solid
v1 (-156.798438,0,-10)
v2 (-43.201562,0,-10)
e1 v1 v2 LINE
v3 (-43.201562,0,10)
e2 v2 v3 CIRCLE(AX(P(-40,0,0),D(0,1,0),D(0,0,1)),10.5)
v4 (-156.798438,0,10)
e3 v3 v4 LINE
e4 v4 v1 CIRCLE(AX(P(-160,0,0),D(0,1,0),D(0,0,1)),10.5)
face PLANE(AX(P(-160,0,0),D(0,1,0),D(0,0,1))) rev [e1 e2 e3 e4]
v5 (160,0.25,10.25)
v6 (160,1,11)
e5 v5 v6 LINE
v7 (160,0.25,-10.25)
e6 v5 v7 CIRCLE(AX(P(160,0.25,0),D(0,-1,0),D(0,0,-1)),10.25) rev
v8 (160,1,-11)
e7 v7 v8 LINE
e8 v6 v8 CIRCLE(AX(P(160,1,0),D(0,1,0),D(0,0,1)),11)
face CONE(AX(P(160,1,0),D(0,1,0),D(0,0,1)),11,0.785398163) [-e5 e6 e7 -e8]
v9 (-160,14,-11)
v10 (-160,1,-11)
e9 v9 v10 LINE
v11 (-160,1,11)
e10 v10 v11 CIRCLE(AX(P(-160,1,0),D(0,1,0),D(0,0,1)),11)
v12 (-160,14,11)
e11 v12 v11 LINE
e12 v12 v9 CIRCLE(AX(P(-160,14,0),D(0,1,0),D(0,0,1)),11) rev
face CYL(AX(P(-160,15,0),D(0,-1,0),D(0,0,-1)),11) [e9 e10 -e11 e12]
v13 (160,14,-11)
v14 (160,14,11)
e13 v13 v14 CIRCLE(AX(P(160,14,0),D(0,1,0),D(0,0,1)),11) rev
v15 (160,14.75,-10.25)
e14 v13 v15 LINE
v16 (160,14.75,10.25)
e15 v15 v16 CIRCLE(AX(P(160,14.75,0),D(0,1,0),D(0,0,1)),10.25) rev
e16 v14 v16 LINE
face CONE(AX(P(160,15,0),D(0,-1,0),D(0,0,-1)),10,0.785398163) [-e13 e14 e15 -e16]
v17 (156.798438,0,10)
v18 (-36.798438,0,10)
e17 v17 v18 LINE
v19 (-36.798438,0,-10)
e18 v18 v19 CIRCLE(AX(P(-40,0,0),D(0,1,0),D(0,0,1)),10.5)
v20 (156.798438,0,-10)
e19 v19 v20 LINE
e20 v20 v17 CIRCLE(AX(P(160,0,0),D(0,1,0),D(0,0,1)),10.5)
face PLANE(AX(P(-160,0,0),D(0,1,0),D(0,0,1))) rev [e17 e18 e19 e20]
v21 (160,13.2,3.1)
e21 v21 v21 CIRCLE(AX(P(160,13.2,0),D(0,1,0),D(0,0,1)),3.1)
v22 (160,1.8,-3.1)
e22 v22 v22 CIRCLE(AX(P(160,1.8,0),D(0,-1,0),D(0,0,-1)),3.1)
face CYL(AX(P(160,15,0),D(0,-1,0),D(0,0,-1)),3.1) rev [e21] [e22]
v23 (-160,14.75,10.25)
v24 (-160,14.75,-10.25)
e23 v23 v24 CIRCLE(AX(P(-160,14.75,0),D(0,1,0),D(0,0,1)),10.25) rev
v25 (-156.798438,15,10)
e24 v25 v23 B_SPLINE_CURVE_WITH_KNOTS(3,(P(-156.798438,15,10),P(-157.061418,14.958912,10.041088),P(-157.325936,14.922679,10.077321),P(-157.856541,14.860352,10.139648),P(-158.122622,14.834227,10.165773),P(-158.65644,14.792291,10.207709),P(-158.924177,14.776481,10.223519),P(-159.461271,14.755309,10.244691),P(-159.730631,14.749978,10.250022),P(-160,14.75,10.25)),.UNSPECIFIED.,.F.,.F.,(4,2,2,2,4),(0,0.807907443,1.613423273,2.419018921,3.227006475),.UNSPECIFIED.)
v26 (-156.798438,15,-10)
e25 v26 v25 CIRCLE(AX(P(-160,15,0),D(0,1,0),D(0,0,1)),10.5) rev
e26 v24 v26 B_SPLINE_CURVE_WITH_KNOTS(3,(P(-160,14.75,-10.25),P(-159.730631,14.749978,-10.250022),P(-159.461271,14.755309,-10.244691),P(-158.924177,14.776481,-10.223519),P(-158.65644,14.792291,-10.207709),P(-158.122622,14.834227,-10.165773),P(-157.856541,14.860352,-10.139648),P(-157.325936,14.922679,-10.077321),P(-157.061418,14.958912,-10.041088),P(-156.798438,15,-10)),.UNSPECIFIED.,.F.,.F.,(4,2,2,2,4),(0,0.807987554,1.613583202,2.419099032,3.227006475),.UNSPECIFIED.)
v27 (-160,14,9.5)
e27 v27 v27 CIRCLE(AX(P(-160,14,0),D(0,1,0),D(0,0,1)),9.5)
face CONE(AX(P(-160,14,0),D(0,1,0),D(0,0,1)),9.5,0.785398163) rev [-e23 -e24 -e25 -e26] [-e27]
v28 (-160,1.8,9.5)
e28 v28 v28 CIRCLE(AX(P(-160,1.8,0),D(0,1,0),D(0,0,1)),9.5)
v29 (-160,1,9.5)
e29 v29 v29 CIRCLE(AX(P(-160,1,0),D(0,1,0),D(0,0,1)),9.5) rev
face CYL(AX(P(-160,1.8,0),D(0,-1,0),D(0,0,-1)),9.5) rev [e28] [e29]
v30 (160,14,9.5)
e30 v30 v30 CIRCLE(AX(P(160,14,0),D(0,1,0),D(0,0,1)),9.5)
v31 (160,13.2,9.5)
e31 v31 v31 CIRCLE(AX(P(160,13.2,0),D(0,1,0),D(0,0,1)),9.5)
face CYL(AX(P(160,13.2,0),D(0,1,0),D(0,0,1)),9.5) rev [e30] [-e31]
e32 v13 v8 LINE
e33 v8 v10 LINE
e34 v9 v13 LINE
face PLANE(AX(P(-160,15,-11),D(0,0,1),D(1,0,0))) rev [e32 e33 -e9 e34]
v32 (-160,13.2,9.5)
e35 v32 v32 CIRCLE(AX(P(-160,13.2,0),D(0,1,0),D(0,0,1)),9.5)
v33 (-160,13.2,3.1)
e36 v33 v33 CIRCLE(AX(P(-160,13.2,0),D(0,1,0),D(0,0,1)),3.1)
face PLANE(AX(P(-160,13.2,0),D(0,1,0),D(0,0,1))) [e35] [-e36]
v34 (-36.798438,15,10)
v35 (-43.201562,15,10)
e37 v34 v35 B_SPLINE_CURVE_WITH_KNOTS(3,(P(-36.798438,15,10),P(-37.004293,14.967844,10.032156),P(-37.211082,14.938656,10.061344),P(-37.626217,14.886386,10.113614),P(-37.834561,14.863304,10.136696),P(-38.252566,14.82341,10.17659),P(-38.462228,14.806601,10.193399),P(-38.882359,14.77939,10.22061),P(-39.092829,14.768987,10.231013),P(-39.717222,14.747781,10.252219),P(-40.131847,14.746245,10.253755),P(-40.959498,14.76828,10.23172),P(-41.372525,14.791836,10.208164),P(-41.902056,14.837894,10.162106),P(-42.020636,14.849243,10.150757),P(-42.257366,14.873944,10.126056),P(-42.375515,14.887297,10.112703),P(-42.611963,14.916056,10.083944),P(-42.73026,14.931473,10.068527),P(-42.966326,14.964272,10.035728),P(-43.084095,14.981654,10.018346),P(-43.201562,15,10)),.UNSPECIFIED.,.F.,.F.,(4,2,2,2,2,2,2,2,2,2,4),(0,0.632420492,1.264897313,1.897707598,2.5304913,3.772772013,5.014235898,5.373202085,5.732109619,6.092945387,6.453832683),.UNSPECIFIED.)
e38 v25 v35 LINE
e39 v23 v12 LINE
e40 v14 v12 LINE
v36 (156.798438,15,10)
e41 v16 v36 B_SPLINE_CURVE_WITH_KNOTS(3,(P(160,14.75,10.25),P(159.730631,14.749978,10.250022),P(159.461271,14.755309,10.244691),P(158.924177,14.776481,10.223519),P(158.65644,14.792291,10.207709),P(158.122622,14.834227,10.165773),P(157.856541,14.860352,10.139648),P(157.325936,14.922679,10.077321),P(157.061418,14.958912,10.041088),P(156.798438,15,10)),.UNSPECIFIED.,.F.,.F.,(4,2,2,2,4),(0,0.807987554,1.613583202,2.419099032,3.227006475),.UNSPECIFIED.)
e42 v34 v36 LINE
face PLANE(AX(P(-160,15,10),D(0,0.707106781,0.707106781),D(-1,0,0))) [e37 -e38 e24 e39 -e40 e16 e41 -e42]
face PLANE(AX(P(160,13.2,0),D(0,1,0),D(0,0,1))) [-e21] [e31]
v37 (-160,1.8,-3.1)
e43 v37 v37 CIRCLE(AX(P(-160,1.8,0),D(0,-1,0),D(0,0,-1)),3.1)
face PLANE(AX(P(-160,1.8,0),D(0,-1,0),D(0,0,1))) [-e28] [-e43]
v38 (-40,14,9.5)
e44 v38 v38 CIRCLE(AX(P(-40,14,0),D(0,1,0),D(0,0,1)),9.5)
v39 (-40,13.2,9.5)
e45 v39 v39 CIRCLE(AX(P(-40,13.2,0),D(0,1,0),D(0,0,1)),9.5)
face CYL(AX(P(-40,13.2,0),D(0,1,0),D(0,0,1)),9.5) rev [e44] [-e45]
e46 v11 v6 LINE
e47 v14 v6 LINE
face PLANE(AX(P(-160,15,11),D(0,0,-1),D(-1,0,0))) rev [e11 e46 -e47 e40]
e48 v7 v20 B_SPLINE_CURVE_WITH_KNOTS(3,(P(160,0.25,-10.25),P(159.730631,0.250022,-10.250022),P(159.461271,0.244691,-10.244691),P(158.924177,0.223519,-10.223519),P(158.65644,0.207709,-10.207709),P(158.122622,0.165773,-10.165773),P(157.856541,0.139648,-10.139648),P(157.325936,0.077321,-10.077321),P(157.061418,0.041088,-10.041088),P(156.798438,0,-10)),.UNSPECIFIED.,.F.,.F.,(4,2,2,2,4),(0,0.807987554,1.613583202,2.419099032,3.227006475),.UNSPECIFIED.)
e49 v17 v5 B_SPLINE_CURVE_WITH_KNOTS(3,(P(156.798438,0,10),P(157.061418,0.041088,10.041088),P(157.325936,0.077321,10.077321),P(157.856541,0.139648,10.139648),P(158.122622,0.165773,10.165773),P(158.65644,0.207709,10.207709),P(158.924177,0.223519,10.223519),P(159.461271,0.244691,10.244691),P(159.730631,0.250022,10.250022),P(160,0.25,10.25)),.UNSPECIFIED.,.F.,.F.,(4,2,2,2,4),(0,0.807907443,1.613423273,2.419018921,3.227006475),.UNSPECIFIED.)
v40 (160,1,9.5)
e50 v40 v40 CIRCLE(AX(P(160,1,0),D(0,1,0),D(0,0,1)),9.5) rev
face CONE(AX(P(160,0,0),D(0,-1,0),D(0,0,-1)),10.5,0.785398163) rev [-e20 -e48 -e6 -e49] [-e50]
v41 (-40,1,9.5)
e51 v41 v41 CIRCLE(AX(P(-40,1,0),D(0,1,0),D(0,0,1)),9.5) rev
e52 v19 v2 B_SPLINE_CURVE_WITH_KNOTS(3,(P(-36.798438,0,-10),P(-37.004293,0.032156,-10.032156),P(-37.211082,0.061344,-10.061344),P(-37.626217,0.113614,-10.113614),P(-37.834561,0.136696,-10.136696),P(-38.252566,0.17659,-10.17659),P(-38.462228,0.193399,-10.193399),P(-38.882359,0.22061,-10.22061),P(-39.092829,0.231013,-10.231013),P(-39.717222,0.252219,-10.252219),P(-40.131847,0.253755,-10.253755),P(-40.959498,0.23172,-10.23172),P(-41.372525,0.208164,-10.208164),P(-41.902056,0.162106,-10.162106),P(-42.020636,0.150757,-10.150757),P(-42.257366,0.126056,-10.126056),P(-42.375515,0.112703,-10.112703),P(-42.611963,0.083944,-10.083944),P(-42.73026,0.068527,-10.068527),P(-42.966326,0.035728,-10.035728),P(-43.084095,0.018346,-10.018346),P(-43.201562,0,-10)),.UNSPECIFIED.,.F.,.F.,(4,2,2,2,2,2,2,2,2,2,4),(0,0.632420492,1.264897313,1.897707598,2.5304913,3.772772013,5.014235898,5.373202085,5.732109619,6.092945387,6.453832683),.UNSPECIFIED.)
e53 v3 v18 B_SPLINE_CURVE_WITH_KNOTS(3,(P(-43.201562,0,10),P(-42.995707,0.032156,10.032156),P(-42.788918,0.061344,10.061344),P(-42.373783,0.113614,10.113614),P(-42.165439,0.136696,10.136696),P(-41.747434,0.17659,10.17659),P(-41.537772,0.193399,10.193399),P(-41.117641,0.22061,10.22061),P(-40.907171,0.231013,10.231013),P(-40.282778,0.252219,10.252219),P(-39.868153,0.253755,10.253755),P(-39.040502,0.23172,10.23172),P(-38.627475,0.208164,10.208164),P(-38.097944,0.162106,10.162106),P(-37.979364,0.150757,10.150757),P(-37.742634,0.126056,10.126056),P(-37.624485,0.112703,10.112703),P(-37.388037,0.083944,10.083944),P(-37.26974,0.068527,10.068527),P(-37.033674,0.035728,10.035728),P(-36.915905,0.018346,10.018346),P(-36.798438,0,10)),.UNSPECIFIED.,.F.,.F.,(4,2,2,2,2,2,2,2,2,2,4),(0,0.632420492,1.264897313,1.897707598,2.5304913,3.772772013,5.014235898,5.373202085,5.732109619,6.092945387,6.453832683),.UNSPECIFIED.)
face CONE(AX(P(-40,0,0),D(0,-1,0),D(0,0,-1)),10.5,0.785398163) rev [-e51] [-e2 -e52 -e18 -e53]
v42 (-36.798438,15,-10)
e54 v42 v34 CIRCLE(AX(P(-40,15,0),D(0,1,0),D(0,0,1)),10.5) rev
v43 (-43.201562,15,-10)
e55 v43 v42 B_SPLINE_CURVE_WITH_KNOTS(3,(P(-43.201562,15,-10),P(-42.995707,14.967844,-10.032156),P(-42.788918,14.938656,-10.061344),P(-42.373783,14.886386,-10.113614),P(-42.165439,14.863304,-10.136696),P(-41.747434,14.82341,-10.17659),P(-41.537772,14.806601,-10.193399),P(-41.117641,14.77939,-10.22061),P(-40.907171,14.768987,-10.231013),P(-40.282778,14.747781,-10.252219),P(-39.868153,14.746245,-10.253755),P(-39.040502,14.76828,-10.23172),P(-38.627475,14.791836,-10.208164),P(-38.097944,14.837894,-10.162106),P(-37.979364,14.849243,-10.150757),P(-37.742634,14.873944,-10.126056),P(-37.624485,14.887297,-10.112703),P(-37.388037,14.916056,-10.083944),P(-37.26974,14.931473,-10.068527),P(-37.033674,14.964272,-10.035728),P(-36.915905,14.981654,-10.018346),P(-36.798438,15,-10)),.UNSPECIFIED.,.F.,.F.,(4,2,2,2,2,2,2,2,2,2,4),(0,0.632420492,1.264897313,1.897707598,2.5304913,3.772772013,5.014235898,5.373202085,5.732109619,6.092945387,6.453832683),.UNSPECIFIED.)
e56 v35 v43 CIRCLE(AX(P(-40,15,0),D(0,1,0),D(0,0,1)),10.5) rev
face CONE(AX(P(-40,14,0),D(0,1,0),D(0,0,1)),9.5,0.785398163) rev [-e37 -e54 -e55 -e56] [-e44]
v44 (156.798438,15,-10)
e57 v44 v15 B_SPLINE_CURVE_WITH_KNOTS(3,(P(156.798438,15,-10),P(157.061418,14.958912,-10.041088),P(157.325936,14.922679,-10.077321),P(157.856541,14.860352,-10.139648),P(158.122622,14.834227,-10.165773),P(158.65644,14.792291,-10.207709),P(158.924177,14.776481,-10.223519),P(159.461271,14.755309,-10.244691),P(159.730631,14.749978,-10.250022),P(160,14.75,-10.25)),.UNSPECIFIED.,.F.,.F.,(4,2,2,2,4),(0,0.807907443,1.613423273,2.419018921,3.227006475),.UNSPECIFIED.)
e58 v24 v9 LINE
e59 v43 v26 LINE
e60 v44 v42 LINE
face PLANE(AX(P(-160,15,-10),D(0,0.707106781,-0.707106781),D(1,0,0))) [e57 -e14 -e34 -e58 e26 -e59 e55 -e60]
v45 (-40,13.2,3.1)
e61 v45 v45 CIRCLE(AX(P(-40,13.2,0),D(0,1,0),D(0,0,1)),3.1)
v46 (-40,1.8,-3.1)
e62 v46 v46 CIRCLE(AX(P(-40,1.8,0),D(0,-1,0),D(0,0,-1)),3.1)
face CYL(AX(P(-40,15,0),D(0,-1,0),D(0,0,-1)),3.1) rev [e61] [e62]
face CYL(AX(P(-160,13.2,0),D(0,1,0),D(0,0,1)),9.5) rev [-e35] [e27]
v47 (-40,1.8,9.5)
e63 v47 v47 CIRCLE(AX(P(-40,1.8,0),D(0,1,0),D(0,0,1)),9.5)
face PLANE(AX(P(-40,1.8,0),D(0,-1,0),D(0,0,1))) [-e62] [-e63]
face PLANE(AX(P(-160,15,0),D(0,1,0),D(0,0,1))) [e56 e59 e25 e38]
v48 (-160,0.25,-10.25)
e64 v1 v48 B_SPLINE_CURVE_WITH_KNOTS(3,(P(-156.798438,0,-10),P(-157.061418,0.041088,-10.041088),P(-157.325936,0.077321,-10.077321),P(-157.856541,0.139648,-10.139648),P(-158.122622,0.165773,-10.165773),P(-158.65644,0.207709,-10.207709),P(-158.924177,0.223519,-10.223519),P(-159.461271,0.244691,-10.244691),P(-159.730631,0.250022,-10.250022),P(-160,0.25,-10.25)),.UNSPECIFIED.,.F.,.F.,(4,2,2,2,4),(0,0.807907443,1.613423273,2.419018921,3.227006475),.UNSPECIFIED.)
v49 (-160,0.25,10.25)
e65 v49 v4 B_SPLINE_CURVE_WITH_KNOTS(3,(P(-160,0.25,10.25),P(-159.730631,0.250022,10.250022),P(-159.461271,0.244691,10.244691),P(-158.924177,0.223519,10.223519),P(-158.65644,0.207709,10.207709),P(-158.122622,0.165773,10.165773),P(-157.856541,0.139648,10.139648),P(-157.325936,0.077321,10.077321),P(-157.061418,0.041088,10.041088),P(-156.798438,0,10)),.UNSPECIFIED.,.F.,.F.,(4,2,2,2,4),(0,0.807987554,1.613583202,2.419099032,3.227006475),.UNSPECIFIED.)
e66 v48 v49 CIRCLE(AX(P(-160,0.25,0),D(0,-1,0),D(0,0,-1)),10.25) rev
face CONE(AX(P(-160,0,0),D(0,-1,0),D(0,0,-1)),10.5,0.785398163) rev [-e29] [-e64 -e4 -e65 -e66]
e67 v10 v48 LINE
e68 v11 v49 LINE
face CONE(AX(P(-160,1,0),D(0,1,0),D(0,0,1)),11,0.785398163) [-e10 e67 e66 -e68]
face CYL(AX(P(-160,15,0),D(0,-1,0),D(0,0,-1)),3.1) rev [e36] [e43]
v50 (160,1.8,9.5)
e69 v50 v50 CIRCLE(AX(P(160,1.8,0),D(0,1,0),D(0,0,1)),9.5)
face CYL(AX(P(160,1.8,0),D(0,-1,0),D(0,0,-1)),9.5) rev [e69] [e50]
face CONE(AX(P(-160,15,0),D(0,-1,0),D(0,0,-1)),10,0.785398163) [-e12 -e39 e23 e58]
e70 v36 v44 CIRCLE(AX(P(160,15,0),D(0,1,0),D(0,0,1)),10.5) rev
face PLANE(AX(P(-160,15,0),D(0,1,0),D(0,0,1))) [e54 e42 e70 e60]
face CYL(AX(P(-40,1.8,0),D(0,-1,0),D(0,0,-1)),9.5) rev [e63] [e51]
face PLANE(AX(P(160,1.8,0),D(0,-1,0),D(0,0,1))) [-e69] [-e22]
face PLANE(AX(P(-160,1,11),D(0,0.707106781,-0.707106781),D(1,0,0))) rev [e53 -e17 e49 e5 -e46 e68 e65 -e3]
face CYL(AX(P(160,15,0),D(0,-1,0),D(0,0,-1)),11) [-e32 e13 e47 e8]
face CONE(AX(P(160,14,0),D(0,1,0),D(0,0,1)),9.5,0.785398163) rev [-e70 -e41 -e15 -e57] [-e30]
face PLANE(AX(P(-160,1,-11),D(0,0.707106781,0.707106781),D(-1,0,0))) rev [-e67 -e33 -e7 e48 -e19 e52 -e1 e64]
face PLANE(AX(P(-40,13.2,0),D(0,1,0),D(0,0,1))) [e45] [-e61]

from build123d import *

# Parameters (mm, degrees)
SKETCH1_R           = 3.1
BOSS_EXTRUDE1_DEPTH = 15
SKETCH2_R           = 9.5
CUT_EXTRUDE1_DEPTH  = 1.8
CHAMFER2_SIZE       = 1


with BuildPart() as part:
    # Sketch1 → Boss-Extrude1 (new body)
    with BuildSketch(Plane(origin=(0, 0, 0), x_dir=(1, 0, 0), z_dir=(0, 1, 0))):
        with BuildLine():
            Line((-160, 11), (160, 11))
            ThreePointArc((160, 11), (171, 0), (160, -11))
            Line((160, -11), (-160, -11))
            ThreePointArc((-160, -11), (-171, 0), (-160, 11))
        make_face()
        with Locations(Location((-160, 0, 0), (0, 0, 270))):
            Circle(SKETCH1_R, mode=Mode.SUBTRACT)
        with Locations(Location((160, 0, 0), (0, 0, 270))):
            Circle(SKETCH1_R, mode=Mode.SUBTRACT)
        with Locations(Location((-40, 0, 0), (0, 0, 270))):
            Circle(SKETCH1_R, mode=Mode.SUBTRACT)
    extrude(amount=BOSS_EXTRUDE1_DEPTH)

    # Sketch2 → Cut-Extrude1 (cut)
    with BuildSketch(Plane(origin=(0, 15, 0), x_dir=(1, 0, 0), z_dir=(0, 1, 0))):
        with Locations(Location((160, 0, 0), (0, 0, 270))):
            Circle(SKETCH2_R)
        with Locations(Location((-40, 0, 0), (0, 0, 270))):
            Circle(SKETCH2_R)
        with Locations(Location((-160, 0, 0), (0, 0, 270))):
            Circle(SKETCH2_R)
    cut_extrude1 = extrude(amount=-CUT_EXTRUDE1_DEPTH, mode=Mode.SUBTRACT)

    # Chamfer2
    chamfer2_edges = [part.edges().sort_by_distance(p)[0] for p in [
        (171, 15, 0),
        (0, 15, -11),
        (-171, 15, 0),
        (0, 0, -11),
        (171, 0, 0),
        (0, 0, 11),
        (-171, 0, 0),
        (0, 15, 11),
    ]]
    chamfer(chamfer2_edges, length=CHAMFER2_SIZE)

    # Mirror1: Cut-Extrude1 across plane
    add(cut_extrude1.mirror(Plane.ZX.offset(7.5)), mode=Mode.SUBTRACT)

    # Chamfer1: read off the stored shape, not the designer's step
    # Chamfer1: loft between two sections, ruled curve by curve
    chamfer1_from = [
        Edge.make_three_point_arc((-160, 1, 9.5), (-169.5, 1, 0), (-160, 1, -9.5)),
        Edge.make_three_point_arc((-160, 1, -9.5), (-150.5, 1, 0), (-160, 1, 9.5)),
    ]
    chamfer1_to = [
        Edge.make_three_point_arc((-160, 0, 10.5), (-170.5, 0, 0), (-160, 0, -10.5)),
        Edge.make_three_point_arc((-160, 0, -10.5), (-149.5, 0, 0), (-160, 0, 10.5)),
    ]
    chamfer1 = Solid(Shell([*[Face.make_surface_from_curves(chamfer1_from[k], chamfer1_to[k]) for k in range(2)], Face(Wire(chamfer1_from)), Face(Wire(chamfer1_to))]))
    add(chamfer1, mode=Mode.SUBTRACT)

    # Chamfer1 2: loft between two sections, ruled curve by curve
    chamfer1_2_from = [
        Edge.make_three_point_arc((-37.103348559, 1, -9.047619048), (-30.952380952, 1, 2.896651441), (-42.896651441, 1, 9.047619048)),
        Edge.make_three_point_arc((-42.896651441, 1, 9.047619048), (-49.047619048, 1, -2.896651441), (-37.103348559, 1, -9.047619048)),
    ]
    chamfer1_2_to = [
        Edge.make_three_point_arc((-36.798437881, 0, -10), (-30, 0, 3.201562119), (-43.201562119, 0, 10)),
        Edge.make_three_point_arc((-43.201562119, 0, 10), (-50, 0, -3.201562119), (-36.798437881, 0, -10)),
    ]
    chamfer1_2 = Solid(Shell([*[Face.make_surface_from_curves(chamfer1_2_from[k], chamfer1_2_to[k]) for k in range(2)], Face(Wire(chamfer1_2_from)), Face(Wire(chamfer1_2_to))]))
    add(chamfer1_2, mode=Mode.SUBTRACT)

    # Chamfer1 3: loft between two sections, ruled curve by curve
    chamfer1_3_from = [
        Edge.make_three_point_arc((160, 1, 9.5), (150.5, 1, 0), (160, 1, -9.5)),
        Edge.make_three_point_arc((160, 1, -9.5), (169.5, 1, 0), (160, 1, 9.5)),
    ]
    chamfer1_3_to = [
        Edge.make_three_point_arc((160, 0, 10.5), (149.5, 0, 0), (160, 0, -10.5)),
        Edge.make_three_point_arc((160, 0, -10.5), (170.5, 0, 0), (160, 0, 10.5)),
    ]
    chamfer1_3 = Solid(Shell([*[Face.make_surface_from_curves(chamfer1_3_from[k], chamfer1_3_to[k]) for k in range(2)], Face(Wire(chamfer1_3_from)), Face(Wire(chamfer1_3_to))]))
    add(chamfer1_3, mode=Mode.SUBTRACT)

    # Chamfer1 4: loft between two sections, ruled curve by curve
    chamfer1_4_from = [
        Edge.make_three_point_arc((160, 14, 9.5), (169.5, 14, 0), (160, 14, -9.5)),
        Edge.make_three_point_arc((160, 14, -9.5), (150.5, 14, 0), (160, 14, 9.5)),
    ]
    chamfer1_4_to = [
        Edge.make_three_point_arc((160, 15, 10.5), (170.5, 15, 0), (160, 15, -10.5)),
        Edge.make_three_point_arc((160, 15, -10.5), (149.5, 15, 0), (160, 15, 10.5)),
    ]
    chamfer1_4 = Solid(Shell([*[Face.make_surface_from_curves(chamfer1_4_from[k], chamfer1_4_to[k]) for k in range(2)], Face(Wire(chamfer1_4_from)), Face(Wire(chamfer1_4_to))]))
    add(chamfer1_4, mode=Mode.SUBTRACT)

    # Chamfer1 5: loft between two sections, ruled curve by curve
    chamfer1_5_from = [
        Edge.make_three_point_arc((-40, 14, 9.5), (-30.5, 14, 0), (-40, 14, -9.5)),
        Edge.make_three_point_arc((-40, 14, -9.5), (-49.5, 14, 0), (-40, 14, 9.5)),
    ]
    chamfer1_5_to = [
        Edge.make_three_point_arc((-40, 15, 10.5), (-29.5, 15, 0), (-40, 15, -10.5)),
        Edge.make_three_point_arc((-40, 15, -10.5), (-50.5, 15, 0), (-40, 15, 10.5)),
    ]
    chamfer1_5 = Solid(Shell([*[Face.make_surface_from_curves(chamfer1_5_from[k], chamfer1_5_to[k]) for k in range(2)], Face(Wire(chamfer1_5_from)), Face(Wire(chamfer1_5_to))]))
    add(chamfer1_5, mode=Mode.SUBTRACT)

    # Chamfer1 6: loft between two sections, ruled curve by curve
    chamfer1_6_from = [
        Edge.make_three_point_arc((-160, 14, 9.5), (-150.5, 14, 0), (-160, 14, -9.5)),
        Edge.make_three_point_arc((-160, 14, -9.5), (-169.5, 14, 0), (-160, 14, 9.5)),
    ]
    chamfer1_6_to = [
        Edge.make_three_point_arc((-160, 15, 10.5), (-149.5, 15, 0), (-160, 15, -10.5)),
        Edge.make_three_point_arc((-160, 15, -10.5), (-170.5, 15, 0), (-160, 15, 10.5)),
    ]
    chamfer1_6 = Solid(Shell([*[Face.make_surface_from_curves(chamfer1_6_from[k], chamfer1_6_to[k]) for k in range(2)], Face(Wire(chamfer1_6_from)), Face(Wire(chamfer1_6_to))]))
    add(chamfer1_6, mode=Mode.SUBTRACT)


solid = part.part
